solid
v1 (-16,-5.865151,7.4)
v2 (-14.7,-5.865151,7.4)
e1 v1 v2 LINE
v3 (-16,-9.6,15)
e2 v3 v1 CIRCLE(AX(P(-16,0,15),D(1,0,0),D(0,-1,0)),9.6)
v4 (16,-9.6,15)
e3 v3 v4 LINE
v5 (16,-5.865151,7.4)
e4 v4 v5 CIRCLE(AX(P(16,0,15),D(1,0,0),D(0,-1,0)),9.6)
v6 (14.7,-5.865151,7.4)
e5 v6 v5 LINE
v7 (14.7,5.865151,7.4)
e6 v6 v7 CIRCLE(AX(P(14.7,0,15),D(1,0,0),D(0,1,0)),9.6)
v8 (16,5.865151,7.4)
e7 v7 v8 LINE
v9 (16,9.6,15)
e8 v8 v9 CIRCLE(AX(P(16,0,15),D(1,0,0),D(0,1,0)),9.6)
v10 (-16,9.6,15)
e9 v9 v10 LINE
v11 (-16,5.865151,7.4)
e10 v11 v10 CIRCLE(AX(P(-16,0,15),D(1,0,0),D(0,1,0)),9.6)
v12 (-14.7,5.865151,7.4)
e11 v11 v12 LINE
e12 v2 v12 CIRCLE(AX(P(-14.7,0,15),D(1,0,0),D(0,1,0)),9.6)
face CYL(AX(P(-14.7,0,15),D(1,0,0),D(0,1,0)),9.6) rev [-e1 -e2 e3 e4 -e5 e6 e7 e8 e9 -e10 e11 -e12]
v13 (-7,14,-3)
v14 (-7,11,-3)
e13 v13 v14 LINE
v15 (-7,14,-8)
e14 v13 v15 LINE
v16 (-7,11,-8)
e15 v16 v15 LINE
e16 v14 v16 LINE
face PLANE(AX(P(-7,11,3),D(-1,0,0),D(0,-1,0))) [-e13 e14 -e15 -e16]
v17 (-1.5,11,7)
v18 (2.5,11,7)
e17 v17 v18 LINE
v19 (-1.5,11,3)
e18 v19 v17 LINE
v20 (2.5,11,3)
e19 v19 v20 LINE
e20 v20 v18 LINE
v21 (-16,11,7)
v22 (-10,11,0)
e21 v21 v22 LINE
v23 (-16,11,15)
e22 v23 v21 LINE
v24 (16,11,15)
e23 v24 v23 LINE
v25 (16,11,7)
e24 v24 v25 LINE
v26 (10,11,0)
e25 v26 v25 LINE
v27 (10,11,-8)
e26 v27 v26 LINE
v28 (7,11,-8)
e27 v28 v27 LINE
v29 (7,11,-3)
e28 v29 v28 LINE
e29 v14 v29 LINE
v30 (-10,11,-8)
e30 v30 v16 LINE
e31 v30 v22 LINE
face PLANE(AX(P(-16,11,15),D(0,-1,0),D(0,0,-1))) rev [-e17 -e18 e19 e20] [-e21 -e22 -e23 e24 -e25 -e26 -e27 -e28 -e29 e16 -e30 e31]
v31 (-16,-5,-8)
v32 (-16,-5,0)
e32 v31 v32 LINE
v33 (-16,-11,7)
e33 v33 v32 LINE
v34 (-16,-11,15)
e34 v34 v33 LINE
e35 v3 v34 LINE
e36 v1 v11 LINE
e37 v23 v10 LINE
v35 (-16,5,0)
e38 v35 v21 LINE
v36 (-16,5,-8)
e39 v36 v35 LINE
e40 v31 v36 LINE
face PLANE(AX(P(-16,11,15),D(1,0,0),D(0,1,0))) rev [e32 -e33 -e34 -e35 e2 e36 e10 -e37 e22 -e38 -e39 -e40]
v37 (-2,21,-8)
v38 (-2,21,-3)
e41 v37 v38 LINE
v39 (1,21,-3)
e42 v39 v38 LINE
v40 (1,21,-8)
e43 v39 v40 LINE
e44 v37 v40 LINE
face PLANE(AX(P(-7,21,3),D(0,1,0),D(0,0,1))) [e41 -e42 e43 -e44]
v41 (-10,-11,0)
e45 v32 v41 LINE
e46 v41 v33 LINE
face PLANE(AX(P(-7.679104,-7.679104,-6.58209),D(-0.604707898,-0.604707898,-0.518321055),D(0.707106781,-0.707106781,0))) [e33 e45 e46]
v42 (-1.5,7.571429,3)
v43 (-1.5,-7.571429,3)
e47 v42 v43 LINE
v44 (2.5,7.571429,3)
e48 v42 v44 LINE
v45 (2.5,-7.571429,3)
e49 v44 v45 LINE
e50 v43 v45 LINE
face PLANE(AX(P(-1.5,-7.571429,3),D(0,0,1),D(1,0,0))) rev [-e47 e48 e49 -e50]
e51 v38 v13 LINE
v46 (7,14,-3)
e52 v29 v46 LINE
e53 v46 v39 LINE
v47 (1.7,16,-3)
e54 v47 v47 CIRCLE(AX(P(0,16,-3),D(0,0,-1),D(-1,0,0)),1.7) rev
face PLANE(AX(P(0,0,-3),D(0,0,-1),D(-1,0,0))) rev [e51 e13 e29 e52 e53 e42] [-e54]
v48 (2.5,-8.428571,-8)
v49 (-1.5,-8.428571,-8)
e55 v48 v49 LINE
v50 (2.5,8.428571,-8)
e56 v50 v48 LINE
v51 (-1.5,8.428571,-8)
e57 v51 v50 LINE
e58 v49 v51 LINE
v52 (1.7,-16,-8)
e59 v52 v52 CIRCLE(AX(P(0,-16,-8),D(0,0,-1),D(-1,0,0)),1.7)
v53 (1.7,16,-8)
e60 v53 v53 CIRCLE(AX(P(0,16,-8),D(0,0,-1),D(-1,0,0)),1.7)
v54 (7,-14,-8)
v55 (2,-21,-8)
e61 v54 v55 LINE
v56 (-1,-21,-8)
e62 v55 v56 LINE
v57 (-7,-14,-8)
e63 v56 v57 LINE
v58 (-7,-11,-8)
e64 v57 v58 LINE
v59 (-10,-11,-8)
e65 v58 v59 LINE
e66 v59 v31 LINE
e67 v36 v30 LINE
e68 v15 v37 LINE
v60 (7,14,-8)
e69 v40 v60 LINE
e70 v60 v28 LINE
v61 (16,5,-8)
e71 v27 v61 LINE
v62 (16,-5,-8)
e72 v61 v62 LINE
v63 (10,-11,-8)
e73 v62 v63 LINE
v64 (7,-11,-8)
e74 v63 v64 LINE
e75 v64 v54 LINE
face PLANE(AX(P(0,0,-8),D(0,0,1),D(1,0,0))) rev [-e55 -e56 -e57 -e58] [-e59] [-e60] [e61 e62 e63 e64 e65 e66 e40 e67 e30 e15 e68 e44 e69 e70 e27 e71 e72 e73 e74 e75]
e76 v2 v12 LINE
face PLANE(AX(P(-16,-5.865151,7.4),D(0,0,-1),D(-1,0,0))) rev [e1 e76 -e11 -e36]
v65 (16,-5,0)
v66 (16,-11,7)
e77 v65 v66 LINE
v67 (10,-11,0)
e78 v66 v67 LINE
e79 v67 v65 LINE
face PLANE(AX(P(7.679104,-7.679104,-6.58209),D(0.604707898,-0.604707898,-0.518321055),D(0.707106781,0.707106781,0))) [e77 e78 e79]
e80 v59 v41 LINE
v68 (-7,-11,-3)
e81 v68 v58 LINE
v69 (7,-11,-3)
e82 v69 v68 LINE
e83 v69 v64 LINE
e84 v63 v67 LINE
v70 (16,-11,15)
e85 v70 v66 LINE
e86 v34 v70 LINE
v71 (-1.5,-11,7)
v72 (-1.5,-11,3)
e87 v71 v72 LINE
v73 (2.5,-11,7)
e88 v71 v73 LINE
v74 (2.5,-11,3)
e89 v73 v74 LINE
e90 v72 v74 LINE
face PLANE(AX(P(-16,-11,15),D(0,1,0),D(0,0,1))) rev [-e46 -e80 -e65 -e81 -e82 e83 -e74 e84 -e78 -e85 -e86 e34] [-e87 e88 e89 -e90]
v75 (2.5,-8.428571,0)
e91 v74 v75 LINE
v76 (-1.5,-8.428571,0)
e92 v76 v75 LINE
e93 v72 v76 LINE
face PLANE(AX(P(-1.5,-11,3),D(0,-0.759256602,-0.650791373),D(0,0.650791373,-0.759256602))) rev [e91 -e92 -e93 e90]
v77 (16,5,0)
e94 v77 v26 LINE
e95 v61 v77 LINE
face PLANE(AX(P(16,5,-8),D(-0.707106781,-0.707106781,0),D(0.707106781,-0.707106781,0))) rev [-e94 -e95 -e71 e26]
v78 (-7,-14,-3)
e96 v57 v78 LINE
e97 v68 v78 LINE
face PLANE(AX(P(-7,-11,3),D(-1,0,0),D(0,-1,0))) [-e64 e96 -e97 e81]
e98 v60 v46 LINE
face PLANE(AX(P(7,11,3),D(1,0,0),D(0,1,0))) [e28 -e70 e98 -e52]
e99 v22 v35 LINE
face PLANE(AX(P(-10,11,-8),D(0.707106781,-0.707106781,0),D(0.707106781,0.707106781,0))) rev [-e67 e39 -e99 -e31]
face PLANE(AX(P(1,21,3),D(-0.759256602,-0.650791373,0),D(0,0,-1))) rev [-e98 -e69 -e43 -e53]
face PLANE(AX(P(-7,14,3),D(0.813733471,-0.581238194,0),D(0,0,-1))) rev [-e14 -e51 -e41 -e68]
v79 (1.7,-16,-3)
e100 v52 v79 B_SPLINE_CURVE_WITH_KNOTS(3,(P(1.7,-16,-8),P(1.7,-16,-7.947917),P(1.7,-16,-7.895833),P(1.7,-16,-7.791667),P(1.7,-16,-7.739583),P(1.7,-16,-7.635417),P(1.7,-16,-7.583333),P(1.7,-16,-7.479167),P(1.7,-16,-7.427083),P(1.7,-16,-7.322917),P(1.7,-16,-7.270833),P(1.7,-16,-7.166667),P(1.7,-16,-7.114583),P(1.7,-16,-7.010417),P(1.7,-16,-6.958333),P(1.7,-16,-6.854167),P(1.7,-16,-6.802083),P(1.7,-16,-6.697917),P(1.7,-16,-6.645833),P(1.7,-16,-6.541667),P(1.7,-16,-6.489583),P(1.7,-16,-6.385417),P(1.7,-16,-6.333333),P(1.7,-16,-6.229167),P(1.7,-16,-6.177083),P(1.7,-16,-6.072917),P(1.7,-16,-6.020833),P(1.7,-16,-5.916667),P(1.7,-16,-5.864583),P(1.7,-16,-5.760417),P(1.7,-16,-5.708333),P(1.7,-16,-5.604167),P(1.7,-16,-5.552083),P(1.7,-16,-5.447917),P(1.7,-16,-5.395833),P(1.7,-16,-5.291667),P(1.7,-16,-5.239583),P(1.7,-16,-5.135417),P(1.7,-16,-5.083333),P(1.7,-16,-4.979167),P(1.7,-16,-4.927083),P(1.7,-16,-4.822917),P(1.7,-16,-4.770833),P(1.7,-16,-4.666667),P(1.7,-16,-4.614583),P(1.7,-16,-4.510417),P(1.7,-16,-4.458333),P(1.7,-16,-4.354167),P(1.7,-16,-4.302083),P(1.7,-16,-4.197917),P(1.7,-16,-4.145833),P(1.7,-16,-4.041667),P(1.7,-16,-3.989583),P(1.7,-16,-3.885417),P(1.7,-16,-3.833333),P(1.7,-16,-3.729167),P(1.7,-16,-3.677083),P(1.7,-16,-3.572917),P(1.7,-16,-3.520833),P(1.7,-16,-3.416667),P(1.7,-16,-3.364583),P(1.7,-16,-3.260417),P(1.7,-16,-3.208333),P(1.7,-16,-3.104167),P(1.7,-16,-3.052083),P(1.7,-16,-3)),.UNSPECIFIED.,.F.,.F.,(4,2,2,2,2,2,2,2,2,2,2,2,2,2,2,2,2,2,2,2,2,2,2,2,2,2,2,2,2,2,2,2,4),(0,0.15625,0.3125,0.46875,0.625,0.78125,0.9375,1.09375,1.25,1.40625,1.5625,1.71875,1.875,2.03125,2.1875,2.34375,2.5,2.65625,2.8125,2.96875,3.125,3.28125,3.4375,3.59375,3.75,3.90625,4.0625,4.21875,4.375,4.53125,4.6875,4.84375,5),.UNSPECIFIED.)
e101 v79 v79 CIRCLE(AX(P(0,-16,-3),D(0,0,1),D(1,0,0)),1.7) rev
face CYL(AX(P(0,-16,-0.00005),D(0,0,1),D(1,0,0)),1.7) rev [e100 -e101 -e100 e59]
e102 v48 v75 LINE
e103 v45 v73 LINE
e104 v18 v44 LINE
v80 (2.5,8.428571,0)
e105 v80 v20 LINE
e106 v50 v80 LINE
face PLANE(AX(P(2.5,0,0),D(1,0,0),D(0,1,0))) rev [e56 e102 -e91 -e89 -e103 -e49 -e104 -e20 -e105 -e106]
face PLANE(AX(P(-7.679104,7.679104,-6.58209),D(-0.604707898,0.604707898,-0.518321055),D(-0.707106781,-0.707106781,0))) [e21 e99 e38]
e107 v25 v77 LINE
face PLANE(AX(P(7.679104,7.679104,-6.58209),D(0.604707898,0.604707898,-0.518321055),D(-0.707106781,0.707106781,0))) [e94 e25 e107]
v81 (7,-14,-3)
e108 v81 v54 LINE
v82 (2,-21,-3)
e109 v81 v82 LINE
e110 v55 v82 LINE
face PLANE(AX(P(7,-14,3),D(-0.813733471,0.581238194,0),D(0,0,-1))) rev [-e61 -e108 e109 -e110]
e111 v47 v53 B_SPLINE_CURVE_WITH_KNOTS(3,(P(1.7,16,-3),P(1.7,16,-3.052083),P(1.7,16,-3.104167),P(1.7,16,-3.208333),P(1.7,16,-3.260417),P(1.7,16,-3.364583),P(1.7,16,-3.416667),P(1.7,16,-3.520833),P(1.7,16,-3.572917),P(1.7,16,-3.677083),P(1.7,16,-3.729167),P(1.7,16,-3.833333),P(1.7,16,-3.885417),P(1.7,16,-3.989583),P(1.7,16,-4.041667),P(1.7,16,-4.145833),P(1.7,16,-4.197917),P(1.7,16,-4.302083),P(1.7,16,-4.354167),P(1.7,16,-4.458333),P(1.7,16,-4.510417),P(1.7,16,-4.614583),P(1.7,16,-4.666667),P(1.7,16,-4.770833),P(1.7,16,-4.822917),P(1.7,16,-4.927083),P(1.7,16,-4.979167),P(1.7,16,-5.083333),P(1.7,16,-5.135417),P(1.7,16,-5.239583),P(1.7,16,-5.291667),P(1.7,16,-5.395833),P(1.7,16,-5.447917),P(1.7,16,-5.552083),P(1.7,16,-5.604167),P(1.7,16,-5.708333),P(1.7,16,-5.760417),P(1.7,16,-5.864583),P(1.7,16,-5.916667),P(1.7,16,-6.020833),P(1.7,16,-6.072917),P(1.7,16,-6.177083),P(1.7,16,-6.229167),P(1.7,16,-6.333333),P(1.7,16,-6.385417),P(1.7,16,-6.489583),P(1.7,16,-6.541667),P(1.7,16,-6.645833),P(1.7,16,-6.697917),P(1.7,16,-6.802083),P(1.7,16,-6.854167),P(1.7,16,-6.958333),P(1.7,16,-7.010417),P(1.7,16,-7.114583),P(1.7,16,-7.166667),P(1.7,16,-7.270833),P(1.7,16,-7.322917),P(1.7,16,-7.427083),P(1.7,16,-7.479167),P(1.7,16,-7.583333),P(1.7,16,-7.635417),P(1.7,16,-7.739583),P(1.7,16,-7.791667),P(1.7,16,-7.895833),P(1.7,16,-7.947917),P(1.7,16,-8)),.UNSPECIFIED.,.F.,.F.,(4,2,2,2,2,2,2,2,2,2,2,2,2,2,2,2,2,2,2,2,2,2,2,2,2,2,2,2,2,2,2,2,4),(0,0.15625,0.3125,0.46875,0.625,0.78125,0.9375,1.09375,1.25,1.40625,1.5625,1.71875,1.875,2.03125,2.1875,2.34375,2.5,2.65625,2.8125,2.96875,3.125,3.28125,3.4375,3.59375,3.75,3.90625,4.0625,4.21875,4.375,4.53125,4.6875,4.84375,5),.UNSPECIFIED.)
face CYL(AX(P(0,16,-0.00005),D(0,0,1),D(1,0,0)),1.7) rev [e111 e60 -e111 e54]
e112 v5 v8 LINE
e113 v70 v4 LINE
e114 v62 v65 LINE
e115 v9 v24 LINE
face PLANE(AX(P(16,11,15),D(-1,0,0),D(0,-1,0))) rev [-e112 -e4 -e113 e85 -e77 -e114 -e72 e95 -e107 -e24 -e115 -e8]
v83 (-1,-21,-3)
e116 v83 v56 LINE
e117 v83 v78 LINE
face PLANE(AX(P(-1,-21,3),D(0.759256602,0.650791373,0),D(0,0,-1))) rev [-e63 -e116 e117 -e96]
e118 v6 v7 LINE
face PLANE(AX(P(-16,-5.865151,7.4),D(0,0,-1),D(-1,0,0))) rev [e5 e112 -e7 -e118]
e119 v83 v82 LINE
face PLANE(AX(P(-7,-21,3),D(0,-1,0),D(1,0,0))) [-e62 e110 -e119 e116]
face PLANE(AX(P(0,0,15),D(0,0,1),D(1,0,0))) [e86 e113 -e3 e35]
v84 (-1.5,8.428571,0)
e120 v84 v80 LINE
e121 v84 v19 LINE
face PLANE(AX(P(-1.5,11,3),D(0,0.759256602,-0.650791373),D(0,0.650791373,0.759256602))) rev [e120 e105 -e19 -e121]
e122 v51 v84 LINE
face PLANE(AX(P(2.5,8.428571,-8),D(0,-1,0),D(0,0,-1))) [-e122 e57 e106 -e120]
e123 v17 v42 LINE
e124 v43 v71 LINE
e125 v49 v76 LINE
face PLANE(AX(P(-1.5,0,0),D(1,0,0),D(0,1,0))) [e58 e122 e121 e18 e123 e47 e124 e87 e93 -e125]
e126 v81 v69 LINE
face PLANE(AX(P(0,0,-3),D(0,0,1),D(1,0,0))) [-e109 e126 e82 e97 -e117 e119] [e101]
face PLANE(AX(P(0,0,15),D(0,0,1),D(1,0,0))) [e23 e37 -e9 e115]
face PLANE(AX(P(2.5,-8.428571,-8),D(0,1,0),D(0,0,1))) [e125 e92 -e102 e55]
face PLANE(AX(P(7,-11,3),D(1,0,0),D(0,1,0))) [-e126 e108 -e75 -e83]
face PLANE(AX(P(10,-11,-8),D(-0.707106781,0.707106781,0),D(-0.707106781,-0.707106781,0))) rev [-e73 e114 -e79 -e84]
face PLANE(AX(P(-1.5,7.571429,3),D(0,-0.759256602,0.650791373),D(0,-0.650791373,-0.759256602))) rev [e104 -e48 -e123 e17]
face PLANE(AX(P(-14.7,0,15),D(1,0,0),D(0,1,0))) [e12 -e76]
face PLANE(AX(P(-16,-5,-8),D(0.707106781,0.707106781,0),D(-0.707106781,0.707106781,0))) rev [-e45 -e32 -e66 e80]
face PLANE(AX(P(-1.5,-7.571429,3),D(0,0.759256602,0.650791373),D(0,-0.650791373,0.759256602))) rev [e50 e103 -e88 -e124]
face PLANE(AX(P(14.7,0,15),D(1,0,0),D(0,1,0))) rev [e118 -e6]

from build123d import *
from OCP.BRepFilletAPI import BRepFilletAPI_MakeChamfer
from build123d.topology import SkipClean

# Parameters (mm, degrees)
BOSS_EXTRU_1_DEPTH           = 15
ENL_V_START                  = -1.3
ESQUISSE2_R                  = 9.6
ENL_V_MAT_EXTRU_1_DEPTH      = 29.4
ENL_V_MAT_EXTRU_2_DEPTH      = 36.895542898805694
ENL_V_MAT_EXTRU_2_DEPTH_BACK = 36.895542898805694
BOSS_EXTRU_2_DEPTH           = 3
ESQUISSE6_R                  = 1.7
ENL_V_MAT_EXTRU_3_DEPTH      = 30.000000000000014
CHANFREIN1_SIZE              = 5
CHANFREIN1_SIZE2             = 7
CHANFREIN2_SIZE              = 7
CHANFREIN2_SIZE2             = 6
CHANFREIN3_START             = 12.698865856
CHANFREIN3_OUTLINE_W         = 11
CHANFREIN3_OUTLINE_H         = 12.000000000000002
CHANFREIN3_DEPTH             = 4.301134144
CHANFREIN4_START             = 12.698865856
CHANFREIN4_OUTLINE_W         = 11
CHANFREIN4_OUTLINE_H         = 12.000000000000002
CHANFREIN4_DEPTH             = 4.301134144
CHANFREIN5_START             = -17
CHANFREIN5_OUTLINE_W         = 11
CHANFREIN5_OUTLINE_H         = 12.000000000000002
CHANFREIN5_DEPTH             = 4.301134144
CHANFREIN6_START             = -17
CHANFREIN6_OUTLINE_W         = 11
CHANFREIN6_OUTLINE_H         = 12.000000000000002
CHANFREIN6_DEPTH             = 4.301134144
ENL_V_START_2                = -13.5
ENL_V_MAT_EXTRU_4_DEPTH      = 4
ESQUISSE10_R                 = 1.6999999999999995
ESQUISSE10_R_2               = 1.7000000000000002
ESQUISSE10_W                 = 4
ESQUISSE10_H                 = 16.857142857142858
BOSS_EXTRU_3_DEPTH           = 8
ESQUISSE12_W                 = 14
ESQUISSE12_H                 = 9.999999999999995
ESQUISSE12_W_2               = 14.000000000000002
ESQUISSE12_H_2               = 9.999999999999996
ENL_V_MAT_EXTRU_6_DEPTH      = 6


with BuildPart() as part:
    # Esquisse1 → Boss.-Extru.1 (new body)
    with BuildSketch(Plane.XY):
        Polygon((-16.000000000000007, 11.000000000000002), (15.999999999999993, 11.000000000000002), (15.999999999999996, -11), (-16, -11), align=None)
    extrude(amount=BOSS_EXTRU_1_DEPTH)

    # Esquisse2 → Enlèv. mat.-Extru.1 (cut)
    with BuildSketch(Plane(origin=(15.999999999999996, 2.52e-15, 0), x_dir=(0, 0, -1), z_dir=(1, 1.6e-16, 0)).offset(ENL_V_START)):
        with Locations((-15, -1.73e-15)):
            Circle(ESQUISSE2_R)
    extrude(amount=-ENL_V_MAT_EXTRU_1_DEPTH, mode=Mode.SUBTRACT)

    # Esquisse4 → Enlèv. mat.-Extru.2 (cut, two sides: drawn at the far end of the back side and taken through both)
    with SkipClean():  # the faces are left unmerged after this step: merging them gives an invalid solid
        with BuildSketch(Plane(origin=(-14.700000000000001, -2.32e-15, 0), x_dir=(0, 0, -1), z_dir=(1, 1.6e-16, 0)).offset(-ENL_V_MAT_EXTRU_2_DEPTH_BACK)):
            with BuildLine():
                Line((-7.3999999999999995, -5.865151319446073), (-7.3999999999999995, 5.865151319446073))
                ThreePointArc((-7.3999999999999995, 5.865151319446073), (-10.76593886833709, 8.615841591704243), (-15.000000000000032, 9.599999999999998))
                Line((-15.000000000000032, 9.599999999999998), (-15, -9.600000000000001))
                ThreePointArc((-15, -9.600000000000001), (-10.765938868337066, -8.615841591704251), (-7.3999999999999995, -5.865151319446073))
            make_face()
        extrude(amount=ENL_V_MAT_EXTRU_2_DEPTH + ENL_V_MAT_EXTRU_2_DEPTH_BACK, mode=Mode.SUBTRACT)

    # Esquisse5 → Boss.-Extru.2 (add)
    with BuildSketch(Plane(origin=(0, 0, 0), x_dir=(-1, 0, 0), z_dir=(0, 0, -1))):
        Polygon((7.000000000000008, -11), (-6.999999999999992, -11.000000000000002), (-6.999999999999991, -20.999999999999993), (7.000000000000009, -20.999999999999996), align=None)
        Polygon((7.000000000000006, 11.000000000000002), (-6.999999999999994, 11), (-6.999999999999992, 20.999999999999996), (7.000000000000008, 20.999999999999996), align=None)
    extrude(amount=-BOSS_EXTRU_2_DEPTH)

    # Esquisse6 → Enlèv. mat.-Extru.3 (cut, through all)
    with BuildSketch(Plane.XY.offset(3)):
        with Locations((0, -15.999999999999996)):
            Circle(ESQUISSE6_R)
        with Locations((8.7e-16, 15.999999999999996)):
            Circle(ESQUISSE6_R)
    extrude(amount=-ENL_V_MAT_EXTRU_3_DEPTH, mode=Mode.SUBTRACT)

    # Chanfrein1: one chamfer whose edges measure the first distance from different faces: ONE call of the kernel's chamfer builder (chamfer() names one face for all edges)
    chanfrein1_edges_1 = [part.edges().sort_by_distance(p)[0] for p in [
        (6.999999999999991, -20.999999999999993, 1.5),
    ]]
    chanfrein1_side_1 = [part.faces().sort_by_distance(p)[0] for p in [
        (-9.13e-15, -20.999999999999993, 1.5),
    ]]
    chanfrein1_edges_2 = [part.edges().sort_by_distance(p)[0] for p in [
        (-7.000000000000008, 20.999999999999996, 1.5),
    ]]
    chanfrein1_side_2 = [part.faces().sort_by_distance(p)[0] for p in [
        (-8.24e-15, 20.999999999999996, 1.5),
    ]]
    chanfrein1 = BRepFilletAPI_MakeChamfer(part.part.solid().wrapped)
    for e in chanfrein1_edges_1:
        chanfrein1.Add(CHANFREIN1_SIZE, CHANFREIN1_SIZE2, e.wrapped, chanfrein1_side_1[0].wrapped)  # the first distance lies on this face
    for e in chanfrein1_edges_2:
        chanfrein1.Add(CHANFREIN1_SIZE, CHANFREIN1_SIZE2, e.wrapped, chanfrein1_side_2[0].wrapped)  # the first distance lies on this face
    add(Compound.cast(chanfrein1.Shape()), mode=Mode.REPLACE)

    # Chanfrein2: one chamfer whose edges measure the first distance from different faces: ONE call of the kernel's chamfer builder (chamfer() names one face for all edges)
    chanfrein2_edges_1 = [part.edges().sort_by_distance(p)[0] for p in [
        (6.999999999999992, 20.999999999999996, 1.5),
    ]]
    chanfrein2_side_1 = [part.faces().sort_by_distance(p)[0] for p in [
        (6.999999999999993, 15.999999999999998, 1.5),
    ]]
    chanfrein2_edges_2 = [part.edges().sort_by_distance(p)[0] for p in [
        (-7.000000000000009, -20.999999999999996, 1.5),
    ]]
    chanfrein2_side_2 = [part.faces().sort_by_distance(p)[0] for p in [
        (-7.000000000000009, -15.999999999999998, 1.5),
    ]]
    chanfrein2 = BRepFilletAPI_MakeChamfer(part.part.solid().wrapped)
    for e in chanfrein2_edges_1:
        chanfrein2.Add(CHANFREIN2_SIZE, CHANFREIN2_SIZE2, e.wrapped, chanfrein2_side_1[0].wrapped)  # the first distance lies on this face
    for e in chanfrein2_edges_2:
        chanfrein2.Add(CHANFREIN2_SIZE, CHANFREIN2_SIZE2, e.wrapped, chanfrein2_side_2[0].wrapped)  # the first distance lies on this face
    add(Compound.cast(chanfrein2.Shape()), mode=Mode.REPLACE)

    # Chanfrein3: read off the stored shape, not the designer's step
    # Chanfrein3 outline → Chanfrein3 (cut)
    with BuildSketch(Plane(origin=(0, 0, 0), x_dir=(0.7964473354898962, 0.4591284639882932, 0.39353868341853704), z_dir=(0.6047078979069521, -0.6047078979069521, -0.5183210553488161)).offset(CHANFREIN3_START)):
        with Locations((6.5, 8)):
            Rectangle(CHANFREIN3_OUTLINE_W, CHANFREIN3_OUTLINE_H)
    extrude(amount=CHANFREIN3_DEPTH, mode=Mode.SUBTRACT)

    # Chanfrein4: read off the stored shape, not the designer's step
    # Chanfrein4 outline → Chanfrein4 (cut)
    with BuildSketch(Plane(origin=(0, 0, 0), x_dir=(0.7964473354898962, -0.45912846398829327, 0.39353868341853704), z_dir=(0.6047078979069521, 0.6047078979069522, -0.5183210553488161)).offset(CHANFREIN4_START)):
        with Locations((6.5, -8)):
            Rectangle(CHANFREIN4_OUTLINE_W, CHANFREIN4_OUTLINE_H)
    extrude(amount=CHANFREIN4_DEPTH, mode=Mode.SUBTRACT)

    # Chanfrein5: read off the stored shape, not the designer's step
    # Chanfrein5 outline → Chanfrein5 (cut)
    with BuildSketch(Plane(origin=(0, 0, 0), x_dir=(0.7964473354898962, 0.45912846398829327, -0.39353868341853704), z_dir=(0.6047078979069521, -0.6047078979069522, 0.5183210553488161)).offset(CHANFREIN5_START)):
        with Locations((-6.5, 8)):
            Rectangle(CHANFREIN5_OUTLINE_W, CHANFREIN5_OUTLINE_H)
    extrude(amount=CHANFREIN5_DEPTH, mode=Mode.SUBTRACT)

    # Chanfrein6: read off the stored shape, not the designer's step
    # Chanfrein6 outline → Chanfrein6 (cut)
    with BuildSketch(Plane(origin=(0, 0, 0), x_dir=(0.796447335489896, -0.45912846398829327, -0.39353868341853715), z_dir=(0.6047078979069522, 0.6047078979069521, 0.5183210553488161)).offset(CHANFREIN6_START)):
        with Locations((-6.5, -8)):
            Rectangle(CHANFREIN6_OUTLINE_W, CHANFREIN6_OUTLINE_H)
    extrude(amount=CHANFREIN6_DEPTH, mode=Mode.SUBTRACT)

    # Esquisse7 → Enlèv. mat.-Extru.4 (cut)
    with BuildSketch(Plane(origin=(15.999999999999996, 2.52e-15, 0), x_dir=(0, 0, -1), z_dir=(1, 1.6e-16, 0)).offset(ENL_V_START_2)):
        Polygon((-3, -7.571428571428581), (-3, 7.571428571428564), (-7.000000000000009, 11), (-3.000000000000009, 11), (-4.5e-16, 8.428571428571422), (1.83e-15, -8.428571428571436), (-2.999999999999989, -11.000000000000002), (-6.9999999999999885, -11.000000000000002), align=None)
    extrude(amount=-ENL_V_MAT_EXTRU_4_DEPTH, mode=Mode.SUBTRACT)

    # Esquisse10 → Boss.-Extru.3 (add)
    with BuildSketch(Plane(origin=(0, 0, 0), x_dir=(-1, 0, 0), z_dir=(0, 0, -1))):
        Polygon((-9.999999999999998, -11.000000000000004), (-15.999999999999996, -5.000000000000007), (-15.999999999999993, 4.999999999999996), (-9.999999999999995, 11), (-6.999999999999994, 11), (-6.999999999999993, 13.999999999999977), (-0.9999999999999818, 20.999999999999996), (1.999999999999995, 20.999999999999996), (7.000000000000008, 13.999999999999968), (7.000000000000006, 11.000000000000002), (10.000000000000009, 11.000000000000004), (16.000000000000004, 5.000000000000002), (16.000000000000007, -4.999999999999992), (9.999999999999993, -11), (7.000000000000008, -11), (7.000000000000008, -13.999999999999963), (0.99999999999999, -20.999999999999996), (-1.9999999999999645, -20.999999999999993), (-6.999999999999992, -13.999999999999954), (-6.999999999999992, -11), align=None)
        with Locations(Location((-8.7e-16, 15.999999999999996, 0), (0, 0, 180))):
            Circle(ESQUISSE10_R, mode=Mode.SUBTRACT)
        with Locations(Location((0, -15.999999999999996, 0), (0, 0, 180))):
            Circle(ESQUISSE10_R_2, mode=Mode.SUBTRACT)
        with Locations((-0.499999999999997, -7.11e-15)):
            Rectangle(ESQUISSE10_W, ESQUISSE10_H, mode=Mode.SUBTRACT)
    extrude(amount=BOSS_EXTRU_3_DEPTH)

    # Esquisse12 → Enlèv. mat.-Extru.6 (cut)
    with BuildSketch(Plane.XY.offset(3)):
        with Locations((-5.77e-15, 16)):
            Rectangle(ESQUISSE12_W, ESQUISSE12_H)
        with Locations((-7.11e-15, -15.999999999999998)):
            Rectangle(ESQUISSE12_W_2, ESQUISSE12_H_2)
    extrude(amount=-ENL_V_MAT_EXTRU_6_DEPTH, mode=Mode.SUBTRACT)


solid = part.part
